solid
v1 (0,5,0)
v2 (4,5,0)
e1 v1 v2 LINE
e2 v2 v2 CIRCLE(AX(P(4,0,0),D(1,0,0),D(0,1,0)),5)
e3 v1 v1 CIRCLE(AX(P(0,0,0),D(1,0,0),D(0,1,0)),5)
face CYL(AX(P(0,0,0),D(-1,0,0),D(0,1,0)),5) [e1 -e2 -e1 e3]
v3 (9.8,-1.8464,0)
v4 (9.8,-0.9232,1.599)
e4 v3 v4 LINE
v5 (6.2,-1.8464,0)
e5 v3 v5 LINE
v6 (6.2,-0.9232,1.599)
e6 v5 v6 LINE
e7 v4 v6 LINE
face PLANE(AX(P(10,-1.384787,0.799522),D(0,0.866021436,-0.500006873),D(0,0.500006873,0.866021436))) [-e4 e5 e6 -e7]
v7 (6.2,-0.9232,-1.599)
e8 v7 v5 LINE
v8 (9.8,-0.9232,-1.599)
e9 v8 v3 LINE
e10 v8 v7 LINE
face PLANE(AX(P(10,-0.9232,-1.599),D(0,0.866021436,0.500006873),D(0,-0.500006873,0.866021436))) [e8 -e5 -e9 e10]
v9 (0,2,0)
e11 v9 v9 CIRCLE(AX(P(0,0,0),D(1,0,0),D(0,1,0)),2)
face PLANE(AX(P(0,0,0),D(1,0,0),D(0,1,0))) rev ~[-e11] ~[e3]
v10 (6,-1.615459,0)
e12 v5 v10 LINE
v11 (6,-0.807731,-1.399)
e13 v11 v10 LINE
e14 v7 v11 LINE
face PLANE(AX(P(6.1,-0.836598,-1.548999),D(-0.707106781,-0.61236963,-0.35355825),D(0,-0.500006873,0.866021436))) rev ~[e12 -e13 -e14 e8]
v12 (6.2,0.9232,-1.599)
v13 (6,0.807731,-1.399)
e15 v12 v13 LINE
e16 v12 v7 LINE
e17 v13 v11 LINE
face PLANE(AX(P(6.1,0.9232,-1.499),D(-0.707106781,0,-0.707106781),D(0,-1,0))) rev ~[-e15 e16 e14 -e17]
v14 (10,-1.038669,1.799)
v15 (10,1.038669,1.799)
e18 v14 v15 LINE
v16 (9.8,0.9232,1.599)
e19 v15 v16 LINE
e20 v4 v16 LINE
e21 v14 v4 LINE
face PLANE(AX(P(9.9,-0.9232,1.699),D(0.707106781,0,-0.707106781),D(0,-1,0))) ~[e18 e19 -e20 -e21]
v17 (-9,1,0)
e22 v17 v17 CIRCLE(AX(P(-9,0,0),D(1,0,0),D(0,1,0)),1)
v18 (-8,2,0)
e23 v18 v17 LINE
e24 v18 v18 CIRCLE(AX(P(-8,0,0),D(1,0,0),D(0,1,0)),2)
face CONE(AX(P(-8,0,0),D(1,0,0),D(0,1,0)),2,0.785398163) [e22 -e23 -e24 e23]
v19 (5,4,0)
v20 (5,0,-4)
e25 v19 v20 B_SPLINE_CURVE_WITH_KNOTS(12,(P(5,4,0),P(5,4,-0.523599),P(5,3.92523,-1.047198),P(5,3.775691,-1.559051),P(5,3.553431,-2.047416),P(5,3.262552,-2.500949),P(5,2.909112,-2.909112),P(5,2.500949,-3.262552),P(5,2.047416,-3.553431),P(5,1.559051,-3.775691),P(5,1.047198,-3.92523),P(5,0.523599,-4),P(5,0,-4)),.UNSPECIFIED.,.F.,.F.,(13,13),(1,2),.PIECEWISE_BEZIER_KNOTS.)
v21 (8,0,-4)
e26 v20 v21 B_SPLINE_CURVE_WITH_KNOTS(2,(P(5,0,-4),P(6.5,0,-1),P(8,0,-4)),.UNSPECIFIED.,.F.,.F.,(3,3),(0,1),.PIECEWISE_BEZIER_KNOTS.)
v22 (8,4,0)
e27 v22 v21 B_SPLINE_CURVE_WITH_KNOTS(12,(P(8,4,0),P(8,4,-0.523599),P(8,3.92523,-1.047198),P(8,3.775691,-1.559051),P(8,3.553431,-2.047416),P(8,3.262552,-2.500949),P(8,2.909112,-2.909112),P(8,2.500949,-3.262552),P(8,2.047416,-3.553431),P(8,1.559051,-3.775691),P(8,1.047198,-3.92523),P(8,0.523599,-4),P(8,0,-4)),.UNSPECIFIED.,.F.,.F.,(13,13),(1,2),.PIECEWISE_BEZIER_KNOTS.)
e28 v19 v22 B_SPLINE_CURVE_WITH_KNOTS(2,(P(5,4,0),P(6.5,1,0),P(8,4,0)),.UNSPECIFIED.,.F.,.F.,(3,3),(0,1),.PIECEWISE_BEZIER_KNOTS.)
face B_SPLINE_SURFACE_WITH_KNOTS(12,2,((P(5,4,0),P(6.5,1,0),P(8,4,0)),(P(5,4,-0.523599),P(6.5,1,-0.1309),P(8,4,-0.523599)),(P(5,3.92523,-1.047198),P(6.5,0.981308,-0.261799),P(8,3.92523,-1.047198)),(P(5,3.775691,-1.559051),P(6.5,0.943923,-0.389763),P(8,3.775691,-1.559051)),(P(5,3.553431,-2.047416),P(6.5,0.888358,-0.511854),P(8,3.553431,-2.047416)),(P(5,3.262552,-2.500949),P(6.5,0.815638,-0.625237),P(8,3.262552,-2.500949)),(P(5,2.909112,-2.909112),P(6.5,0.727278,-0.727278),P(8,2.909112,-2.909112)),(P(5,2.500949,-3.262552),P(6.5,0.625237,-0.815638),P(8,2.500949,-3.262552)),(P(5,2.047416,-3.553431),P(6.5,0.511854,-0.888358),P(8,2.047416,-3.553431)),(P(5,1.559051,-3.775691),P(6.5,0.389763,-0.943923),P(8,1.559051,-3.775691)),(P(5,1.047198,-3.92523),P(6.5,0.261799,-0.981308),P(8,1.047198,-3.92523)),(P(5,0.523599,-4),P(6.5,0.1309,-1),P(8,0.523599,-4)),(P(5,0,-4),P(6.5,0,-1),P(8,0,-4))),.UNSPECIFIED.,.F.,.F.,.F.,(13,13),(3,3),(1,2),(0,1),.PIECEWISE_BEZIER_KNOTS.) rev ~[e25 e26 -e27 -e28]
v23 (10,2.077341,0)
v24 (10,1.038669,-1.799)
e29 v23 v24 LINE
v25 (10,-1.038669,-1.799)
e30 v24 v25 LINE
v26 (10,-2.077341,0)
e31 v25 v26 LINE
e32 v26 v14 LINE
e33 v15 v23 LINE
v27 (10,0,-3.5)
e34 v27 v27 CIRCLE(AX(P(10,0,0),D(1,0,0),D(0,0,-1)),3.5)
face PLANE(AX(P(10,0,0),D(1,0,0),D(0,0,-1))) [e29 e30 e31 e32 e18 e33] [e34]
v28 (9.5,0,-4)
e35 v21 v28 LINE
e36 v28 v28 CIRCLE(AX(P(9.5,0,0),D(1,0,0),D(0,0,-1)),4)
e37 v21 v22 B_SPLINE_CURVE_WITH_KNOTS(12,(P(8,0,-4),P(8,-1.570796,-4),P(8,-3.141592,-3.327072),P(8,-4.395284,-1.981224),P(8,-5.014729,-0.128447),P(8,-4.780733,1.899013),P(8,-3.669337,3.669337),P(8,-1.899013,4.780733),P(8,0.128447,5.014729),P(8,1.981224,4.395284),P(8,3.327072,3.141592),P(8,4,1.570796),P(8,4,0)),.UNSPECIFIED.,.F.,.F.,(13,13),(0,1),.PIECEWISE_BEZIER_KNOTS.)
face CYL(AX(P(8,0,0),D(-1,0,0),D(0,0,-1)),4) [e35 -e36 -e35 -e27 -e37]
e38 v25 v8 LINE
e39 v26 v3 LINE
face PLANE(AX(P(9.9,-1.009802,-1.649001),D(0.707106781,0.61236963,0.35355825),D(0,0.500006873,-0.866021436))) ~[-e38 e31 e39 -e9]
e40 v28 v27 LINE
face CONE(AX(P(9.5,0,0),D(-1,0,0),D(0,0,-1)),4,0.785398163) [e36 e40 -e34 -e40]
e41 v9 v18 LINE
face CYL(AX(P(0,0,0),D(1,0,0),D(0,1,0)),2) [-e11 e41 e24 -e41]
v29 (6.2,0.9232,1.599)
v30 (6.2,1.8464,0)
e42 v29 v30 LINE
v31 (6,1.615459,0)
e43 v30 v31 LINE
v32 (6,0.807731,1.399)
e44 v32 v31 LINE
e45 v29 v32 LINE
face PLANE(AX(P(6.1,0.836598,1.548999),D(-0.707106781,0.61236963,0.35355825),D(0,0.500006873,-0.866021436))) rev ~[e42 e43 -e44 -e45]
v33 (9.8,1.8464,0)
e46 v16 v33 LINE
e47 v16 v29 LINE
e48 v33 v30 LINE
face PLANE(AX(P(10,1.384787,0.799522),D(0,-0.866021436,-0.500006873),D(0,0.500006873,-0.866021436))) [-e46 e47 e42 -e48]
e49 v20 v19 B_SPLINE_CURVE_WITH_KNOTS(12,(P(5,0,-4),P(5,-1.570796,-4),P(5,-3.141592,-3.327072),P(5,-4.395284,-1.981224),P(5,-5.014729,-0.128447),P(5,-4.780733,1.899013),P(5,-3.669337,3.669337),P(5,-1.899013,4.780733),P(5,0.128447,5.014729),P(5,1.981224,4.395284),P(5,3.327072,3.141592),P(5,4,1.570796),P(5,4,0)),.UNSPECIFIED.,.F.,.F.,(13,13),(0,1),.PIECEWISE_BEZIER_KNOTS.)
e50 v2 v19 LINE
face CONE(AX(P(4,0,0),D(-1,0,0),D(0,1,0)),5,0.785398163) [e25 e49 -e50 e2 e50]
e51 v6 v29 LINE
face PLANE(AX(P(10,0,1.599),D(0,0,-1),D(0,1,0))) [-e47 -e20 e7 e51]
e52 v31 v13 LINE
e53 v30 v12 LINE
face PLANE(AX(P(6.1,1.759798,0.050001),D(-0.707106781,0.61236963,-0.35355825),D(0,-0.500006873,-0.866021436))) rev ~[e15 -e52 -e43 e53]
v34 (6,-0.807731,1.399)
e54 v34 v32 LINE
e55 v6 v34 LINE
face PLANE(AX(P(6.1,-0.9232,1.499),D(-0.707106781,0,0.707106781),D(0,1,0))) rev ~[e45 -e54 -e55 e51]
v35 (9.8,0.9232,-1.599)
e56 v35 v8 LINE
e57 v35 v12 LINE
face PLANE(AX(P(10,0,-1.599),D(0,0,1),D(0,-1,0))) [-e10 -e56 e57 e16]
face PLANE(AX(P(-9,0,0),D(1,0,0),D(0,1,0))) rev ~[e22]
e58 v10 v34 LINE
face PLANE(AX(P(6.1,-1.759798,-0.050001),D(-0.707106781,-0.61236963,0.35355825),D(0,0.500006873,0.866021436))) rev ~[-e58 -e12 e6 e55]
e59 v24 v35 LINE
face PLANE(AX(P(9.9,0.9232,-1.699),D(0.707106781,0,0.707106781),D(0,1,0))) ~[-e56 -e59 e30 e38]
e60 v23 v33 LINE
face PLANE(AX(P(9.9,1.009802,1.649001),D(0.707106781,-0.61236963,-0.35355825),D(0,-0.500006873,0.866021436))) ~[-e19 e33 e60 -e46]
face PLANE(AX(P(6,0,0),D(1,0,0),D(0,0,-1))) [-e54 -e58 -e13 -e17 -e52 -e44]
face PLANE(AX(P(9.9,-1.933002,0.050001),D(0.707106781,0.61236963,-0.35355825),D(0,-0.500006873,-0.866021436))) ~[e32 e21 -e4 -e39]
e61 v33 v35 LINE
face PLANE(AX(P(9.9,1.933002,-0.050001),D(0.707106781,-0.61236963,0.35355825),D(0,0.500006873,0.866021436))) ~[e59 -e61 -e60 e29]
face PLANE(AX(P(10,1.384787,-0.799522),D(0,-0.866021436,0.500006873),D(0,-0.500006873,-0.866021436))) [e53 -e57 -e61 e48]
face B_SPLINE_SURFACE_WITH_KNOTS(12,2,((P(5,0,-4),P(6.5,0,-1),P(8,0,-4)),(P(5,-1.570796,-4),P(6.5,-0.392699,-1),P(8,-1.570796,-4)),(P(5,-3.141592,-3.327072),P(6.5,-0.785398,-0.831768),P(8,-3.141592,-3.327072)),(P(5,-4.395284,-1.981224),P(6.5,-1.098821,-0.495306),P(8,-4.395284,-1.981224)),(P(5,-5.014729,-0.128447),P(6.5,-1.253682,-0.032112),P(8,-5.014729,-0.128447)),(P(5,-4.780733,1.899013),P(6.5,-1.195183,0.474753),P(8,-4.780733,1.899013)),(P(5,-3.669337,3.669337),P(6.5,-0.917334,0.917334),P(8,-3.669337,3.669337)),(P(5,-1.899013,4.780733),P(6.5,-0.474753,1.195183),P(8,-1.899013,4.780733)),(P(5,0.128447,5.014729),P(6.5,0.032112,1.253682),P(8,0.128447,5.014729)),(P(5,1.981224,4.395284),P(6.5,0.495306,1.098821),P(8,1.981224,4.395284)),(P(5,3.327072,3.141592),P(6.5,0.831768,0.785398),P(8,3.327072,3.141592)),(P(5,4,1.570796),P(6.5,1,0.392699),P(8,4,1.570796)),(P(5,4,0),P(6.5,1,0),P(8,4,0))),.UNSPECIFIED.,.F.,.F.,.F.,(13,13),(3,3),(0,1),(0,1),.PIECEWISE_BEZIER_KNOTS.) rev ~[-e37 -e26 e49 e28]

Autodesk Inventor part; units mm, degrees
ref_plane "YZ Plane" through (0, 0, 0) normal (1, 0, 0) x (0, 1, 0)
ref_plane "XZ Plane" through (0, 0, 0) normal (0, 1, 0) x (-1, 0, 0)
sketch "草图1" plane through (0, 0, 0) normal (1, 0, 0) x (0, 1, 0)
  circle A0 centre (0, 0) radius 2
  circle A1 centre (0, 0) radius 5
  dimension "d0" = 4
  dimension "d1" = 10
extrude "拉伸1" add sketch "草图1" along normal blind 5 contours A0 | A1
extrude "拉伸2" add sketch "草图1" against normal blind 9 contours A0
chamfer "倒角1" distance 1 angle 45 1 edges at (-9, -2, 0)
thread "螺纹1" size "M4x0.7" class "6g" standard "ANSI Metric M Profile" length 9
ref_plane "工作平面2" through (8, 0, 0) normal (1, 0, 0) x (0, 0, -1)
ref_plane "工作平面1" through (6.5, 0, 0) normal (1, 0, 0) x (0, 0, -1)
sketch "草图3" plane through (8, 0, 0) normal (1, 0, 0) x (0, 0, -1)
  circle A0 centre (0, 0) radius 4
  dimension "d14" = 8
extrude "拉伸3" add sketch "草图3" along normal blind 2
chamfer "倒角3" distance 1 angle 45 1 edges at (5, -5, 0)
sketch "草图4" plane through (6.5, 0, 0) normal (1, 0, 0) x (0, 0, -1)
  circle A0 centre (0, 0) radius 2.5
  dimension "d29" = 5
loft "放样2" add profiles "草图4" section 1 edges at (5, -4, 0) section 3 edges at (8, 0, 4)
chamfer "倒角4" distance 0.5 angle 45 1 edges at (10, 0, 4)
sketch "草图6" plane through (10, 0, 0) normal (1, 0, 0) x (0, 0, -1)
  circle A0 centre (0, 0) radius 1.6
  line L0 (1.599, -0.9232) -> (0, -1.8464)
  line L1 (0, -1.8464) -> (-1.599, -0.9232)
  line L2 (-1.599, -0.9232) -> (-1.599, 0.9232)
  line L3 (-1.599, 0.9232) -> (0, 1.8464)
  line L4 (0, 1.8464) -> (1.599, 0.9232)
  line L5 (1.599, 0.9232) -> (1.599, -0.9232)
  dimension "d46" = 3.2
extrude "拉伸5" cut sketch "草图6" against normal blind 4
chamfer "倒角6" distance 0.2 angle 45 6 edges at (10, 1.3848, -0.7995) (10, 1.3848, 0.7995) (10, 0, 1.599) (10, -1.3848, 0.7995) (10, -1.3848, -0.7995) (10, 0, -1.599)
chamfer "倒角7" distance 0.2 angle 45 6 edges at (6, 1.3848, 0.7995) (6, 1.3848, -0.7995) (6, 0, 1.599) (6, -1.3848, 0.7995) (6, -1.3848, -0.7995) (6, 0, -1.599)
properties part number "knob" material "铝 6061-AHC"
